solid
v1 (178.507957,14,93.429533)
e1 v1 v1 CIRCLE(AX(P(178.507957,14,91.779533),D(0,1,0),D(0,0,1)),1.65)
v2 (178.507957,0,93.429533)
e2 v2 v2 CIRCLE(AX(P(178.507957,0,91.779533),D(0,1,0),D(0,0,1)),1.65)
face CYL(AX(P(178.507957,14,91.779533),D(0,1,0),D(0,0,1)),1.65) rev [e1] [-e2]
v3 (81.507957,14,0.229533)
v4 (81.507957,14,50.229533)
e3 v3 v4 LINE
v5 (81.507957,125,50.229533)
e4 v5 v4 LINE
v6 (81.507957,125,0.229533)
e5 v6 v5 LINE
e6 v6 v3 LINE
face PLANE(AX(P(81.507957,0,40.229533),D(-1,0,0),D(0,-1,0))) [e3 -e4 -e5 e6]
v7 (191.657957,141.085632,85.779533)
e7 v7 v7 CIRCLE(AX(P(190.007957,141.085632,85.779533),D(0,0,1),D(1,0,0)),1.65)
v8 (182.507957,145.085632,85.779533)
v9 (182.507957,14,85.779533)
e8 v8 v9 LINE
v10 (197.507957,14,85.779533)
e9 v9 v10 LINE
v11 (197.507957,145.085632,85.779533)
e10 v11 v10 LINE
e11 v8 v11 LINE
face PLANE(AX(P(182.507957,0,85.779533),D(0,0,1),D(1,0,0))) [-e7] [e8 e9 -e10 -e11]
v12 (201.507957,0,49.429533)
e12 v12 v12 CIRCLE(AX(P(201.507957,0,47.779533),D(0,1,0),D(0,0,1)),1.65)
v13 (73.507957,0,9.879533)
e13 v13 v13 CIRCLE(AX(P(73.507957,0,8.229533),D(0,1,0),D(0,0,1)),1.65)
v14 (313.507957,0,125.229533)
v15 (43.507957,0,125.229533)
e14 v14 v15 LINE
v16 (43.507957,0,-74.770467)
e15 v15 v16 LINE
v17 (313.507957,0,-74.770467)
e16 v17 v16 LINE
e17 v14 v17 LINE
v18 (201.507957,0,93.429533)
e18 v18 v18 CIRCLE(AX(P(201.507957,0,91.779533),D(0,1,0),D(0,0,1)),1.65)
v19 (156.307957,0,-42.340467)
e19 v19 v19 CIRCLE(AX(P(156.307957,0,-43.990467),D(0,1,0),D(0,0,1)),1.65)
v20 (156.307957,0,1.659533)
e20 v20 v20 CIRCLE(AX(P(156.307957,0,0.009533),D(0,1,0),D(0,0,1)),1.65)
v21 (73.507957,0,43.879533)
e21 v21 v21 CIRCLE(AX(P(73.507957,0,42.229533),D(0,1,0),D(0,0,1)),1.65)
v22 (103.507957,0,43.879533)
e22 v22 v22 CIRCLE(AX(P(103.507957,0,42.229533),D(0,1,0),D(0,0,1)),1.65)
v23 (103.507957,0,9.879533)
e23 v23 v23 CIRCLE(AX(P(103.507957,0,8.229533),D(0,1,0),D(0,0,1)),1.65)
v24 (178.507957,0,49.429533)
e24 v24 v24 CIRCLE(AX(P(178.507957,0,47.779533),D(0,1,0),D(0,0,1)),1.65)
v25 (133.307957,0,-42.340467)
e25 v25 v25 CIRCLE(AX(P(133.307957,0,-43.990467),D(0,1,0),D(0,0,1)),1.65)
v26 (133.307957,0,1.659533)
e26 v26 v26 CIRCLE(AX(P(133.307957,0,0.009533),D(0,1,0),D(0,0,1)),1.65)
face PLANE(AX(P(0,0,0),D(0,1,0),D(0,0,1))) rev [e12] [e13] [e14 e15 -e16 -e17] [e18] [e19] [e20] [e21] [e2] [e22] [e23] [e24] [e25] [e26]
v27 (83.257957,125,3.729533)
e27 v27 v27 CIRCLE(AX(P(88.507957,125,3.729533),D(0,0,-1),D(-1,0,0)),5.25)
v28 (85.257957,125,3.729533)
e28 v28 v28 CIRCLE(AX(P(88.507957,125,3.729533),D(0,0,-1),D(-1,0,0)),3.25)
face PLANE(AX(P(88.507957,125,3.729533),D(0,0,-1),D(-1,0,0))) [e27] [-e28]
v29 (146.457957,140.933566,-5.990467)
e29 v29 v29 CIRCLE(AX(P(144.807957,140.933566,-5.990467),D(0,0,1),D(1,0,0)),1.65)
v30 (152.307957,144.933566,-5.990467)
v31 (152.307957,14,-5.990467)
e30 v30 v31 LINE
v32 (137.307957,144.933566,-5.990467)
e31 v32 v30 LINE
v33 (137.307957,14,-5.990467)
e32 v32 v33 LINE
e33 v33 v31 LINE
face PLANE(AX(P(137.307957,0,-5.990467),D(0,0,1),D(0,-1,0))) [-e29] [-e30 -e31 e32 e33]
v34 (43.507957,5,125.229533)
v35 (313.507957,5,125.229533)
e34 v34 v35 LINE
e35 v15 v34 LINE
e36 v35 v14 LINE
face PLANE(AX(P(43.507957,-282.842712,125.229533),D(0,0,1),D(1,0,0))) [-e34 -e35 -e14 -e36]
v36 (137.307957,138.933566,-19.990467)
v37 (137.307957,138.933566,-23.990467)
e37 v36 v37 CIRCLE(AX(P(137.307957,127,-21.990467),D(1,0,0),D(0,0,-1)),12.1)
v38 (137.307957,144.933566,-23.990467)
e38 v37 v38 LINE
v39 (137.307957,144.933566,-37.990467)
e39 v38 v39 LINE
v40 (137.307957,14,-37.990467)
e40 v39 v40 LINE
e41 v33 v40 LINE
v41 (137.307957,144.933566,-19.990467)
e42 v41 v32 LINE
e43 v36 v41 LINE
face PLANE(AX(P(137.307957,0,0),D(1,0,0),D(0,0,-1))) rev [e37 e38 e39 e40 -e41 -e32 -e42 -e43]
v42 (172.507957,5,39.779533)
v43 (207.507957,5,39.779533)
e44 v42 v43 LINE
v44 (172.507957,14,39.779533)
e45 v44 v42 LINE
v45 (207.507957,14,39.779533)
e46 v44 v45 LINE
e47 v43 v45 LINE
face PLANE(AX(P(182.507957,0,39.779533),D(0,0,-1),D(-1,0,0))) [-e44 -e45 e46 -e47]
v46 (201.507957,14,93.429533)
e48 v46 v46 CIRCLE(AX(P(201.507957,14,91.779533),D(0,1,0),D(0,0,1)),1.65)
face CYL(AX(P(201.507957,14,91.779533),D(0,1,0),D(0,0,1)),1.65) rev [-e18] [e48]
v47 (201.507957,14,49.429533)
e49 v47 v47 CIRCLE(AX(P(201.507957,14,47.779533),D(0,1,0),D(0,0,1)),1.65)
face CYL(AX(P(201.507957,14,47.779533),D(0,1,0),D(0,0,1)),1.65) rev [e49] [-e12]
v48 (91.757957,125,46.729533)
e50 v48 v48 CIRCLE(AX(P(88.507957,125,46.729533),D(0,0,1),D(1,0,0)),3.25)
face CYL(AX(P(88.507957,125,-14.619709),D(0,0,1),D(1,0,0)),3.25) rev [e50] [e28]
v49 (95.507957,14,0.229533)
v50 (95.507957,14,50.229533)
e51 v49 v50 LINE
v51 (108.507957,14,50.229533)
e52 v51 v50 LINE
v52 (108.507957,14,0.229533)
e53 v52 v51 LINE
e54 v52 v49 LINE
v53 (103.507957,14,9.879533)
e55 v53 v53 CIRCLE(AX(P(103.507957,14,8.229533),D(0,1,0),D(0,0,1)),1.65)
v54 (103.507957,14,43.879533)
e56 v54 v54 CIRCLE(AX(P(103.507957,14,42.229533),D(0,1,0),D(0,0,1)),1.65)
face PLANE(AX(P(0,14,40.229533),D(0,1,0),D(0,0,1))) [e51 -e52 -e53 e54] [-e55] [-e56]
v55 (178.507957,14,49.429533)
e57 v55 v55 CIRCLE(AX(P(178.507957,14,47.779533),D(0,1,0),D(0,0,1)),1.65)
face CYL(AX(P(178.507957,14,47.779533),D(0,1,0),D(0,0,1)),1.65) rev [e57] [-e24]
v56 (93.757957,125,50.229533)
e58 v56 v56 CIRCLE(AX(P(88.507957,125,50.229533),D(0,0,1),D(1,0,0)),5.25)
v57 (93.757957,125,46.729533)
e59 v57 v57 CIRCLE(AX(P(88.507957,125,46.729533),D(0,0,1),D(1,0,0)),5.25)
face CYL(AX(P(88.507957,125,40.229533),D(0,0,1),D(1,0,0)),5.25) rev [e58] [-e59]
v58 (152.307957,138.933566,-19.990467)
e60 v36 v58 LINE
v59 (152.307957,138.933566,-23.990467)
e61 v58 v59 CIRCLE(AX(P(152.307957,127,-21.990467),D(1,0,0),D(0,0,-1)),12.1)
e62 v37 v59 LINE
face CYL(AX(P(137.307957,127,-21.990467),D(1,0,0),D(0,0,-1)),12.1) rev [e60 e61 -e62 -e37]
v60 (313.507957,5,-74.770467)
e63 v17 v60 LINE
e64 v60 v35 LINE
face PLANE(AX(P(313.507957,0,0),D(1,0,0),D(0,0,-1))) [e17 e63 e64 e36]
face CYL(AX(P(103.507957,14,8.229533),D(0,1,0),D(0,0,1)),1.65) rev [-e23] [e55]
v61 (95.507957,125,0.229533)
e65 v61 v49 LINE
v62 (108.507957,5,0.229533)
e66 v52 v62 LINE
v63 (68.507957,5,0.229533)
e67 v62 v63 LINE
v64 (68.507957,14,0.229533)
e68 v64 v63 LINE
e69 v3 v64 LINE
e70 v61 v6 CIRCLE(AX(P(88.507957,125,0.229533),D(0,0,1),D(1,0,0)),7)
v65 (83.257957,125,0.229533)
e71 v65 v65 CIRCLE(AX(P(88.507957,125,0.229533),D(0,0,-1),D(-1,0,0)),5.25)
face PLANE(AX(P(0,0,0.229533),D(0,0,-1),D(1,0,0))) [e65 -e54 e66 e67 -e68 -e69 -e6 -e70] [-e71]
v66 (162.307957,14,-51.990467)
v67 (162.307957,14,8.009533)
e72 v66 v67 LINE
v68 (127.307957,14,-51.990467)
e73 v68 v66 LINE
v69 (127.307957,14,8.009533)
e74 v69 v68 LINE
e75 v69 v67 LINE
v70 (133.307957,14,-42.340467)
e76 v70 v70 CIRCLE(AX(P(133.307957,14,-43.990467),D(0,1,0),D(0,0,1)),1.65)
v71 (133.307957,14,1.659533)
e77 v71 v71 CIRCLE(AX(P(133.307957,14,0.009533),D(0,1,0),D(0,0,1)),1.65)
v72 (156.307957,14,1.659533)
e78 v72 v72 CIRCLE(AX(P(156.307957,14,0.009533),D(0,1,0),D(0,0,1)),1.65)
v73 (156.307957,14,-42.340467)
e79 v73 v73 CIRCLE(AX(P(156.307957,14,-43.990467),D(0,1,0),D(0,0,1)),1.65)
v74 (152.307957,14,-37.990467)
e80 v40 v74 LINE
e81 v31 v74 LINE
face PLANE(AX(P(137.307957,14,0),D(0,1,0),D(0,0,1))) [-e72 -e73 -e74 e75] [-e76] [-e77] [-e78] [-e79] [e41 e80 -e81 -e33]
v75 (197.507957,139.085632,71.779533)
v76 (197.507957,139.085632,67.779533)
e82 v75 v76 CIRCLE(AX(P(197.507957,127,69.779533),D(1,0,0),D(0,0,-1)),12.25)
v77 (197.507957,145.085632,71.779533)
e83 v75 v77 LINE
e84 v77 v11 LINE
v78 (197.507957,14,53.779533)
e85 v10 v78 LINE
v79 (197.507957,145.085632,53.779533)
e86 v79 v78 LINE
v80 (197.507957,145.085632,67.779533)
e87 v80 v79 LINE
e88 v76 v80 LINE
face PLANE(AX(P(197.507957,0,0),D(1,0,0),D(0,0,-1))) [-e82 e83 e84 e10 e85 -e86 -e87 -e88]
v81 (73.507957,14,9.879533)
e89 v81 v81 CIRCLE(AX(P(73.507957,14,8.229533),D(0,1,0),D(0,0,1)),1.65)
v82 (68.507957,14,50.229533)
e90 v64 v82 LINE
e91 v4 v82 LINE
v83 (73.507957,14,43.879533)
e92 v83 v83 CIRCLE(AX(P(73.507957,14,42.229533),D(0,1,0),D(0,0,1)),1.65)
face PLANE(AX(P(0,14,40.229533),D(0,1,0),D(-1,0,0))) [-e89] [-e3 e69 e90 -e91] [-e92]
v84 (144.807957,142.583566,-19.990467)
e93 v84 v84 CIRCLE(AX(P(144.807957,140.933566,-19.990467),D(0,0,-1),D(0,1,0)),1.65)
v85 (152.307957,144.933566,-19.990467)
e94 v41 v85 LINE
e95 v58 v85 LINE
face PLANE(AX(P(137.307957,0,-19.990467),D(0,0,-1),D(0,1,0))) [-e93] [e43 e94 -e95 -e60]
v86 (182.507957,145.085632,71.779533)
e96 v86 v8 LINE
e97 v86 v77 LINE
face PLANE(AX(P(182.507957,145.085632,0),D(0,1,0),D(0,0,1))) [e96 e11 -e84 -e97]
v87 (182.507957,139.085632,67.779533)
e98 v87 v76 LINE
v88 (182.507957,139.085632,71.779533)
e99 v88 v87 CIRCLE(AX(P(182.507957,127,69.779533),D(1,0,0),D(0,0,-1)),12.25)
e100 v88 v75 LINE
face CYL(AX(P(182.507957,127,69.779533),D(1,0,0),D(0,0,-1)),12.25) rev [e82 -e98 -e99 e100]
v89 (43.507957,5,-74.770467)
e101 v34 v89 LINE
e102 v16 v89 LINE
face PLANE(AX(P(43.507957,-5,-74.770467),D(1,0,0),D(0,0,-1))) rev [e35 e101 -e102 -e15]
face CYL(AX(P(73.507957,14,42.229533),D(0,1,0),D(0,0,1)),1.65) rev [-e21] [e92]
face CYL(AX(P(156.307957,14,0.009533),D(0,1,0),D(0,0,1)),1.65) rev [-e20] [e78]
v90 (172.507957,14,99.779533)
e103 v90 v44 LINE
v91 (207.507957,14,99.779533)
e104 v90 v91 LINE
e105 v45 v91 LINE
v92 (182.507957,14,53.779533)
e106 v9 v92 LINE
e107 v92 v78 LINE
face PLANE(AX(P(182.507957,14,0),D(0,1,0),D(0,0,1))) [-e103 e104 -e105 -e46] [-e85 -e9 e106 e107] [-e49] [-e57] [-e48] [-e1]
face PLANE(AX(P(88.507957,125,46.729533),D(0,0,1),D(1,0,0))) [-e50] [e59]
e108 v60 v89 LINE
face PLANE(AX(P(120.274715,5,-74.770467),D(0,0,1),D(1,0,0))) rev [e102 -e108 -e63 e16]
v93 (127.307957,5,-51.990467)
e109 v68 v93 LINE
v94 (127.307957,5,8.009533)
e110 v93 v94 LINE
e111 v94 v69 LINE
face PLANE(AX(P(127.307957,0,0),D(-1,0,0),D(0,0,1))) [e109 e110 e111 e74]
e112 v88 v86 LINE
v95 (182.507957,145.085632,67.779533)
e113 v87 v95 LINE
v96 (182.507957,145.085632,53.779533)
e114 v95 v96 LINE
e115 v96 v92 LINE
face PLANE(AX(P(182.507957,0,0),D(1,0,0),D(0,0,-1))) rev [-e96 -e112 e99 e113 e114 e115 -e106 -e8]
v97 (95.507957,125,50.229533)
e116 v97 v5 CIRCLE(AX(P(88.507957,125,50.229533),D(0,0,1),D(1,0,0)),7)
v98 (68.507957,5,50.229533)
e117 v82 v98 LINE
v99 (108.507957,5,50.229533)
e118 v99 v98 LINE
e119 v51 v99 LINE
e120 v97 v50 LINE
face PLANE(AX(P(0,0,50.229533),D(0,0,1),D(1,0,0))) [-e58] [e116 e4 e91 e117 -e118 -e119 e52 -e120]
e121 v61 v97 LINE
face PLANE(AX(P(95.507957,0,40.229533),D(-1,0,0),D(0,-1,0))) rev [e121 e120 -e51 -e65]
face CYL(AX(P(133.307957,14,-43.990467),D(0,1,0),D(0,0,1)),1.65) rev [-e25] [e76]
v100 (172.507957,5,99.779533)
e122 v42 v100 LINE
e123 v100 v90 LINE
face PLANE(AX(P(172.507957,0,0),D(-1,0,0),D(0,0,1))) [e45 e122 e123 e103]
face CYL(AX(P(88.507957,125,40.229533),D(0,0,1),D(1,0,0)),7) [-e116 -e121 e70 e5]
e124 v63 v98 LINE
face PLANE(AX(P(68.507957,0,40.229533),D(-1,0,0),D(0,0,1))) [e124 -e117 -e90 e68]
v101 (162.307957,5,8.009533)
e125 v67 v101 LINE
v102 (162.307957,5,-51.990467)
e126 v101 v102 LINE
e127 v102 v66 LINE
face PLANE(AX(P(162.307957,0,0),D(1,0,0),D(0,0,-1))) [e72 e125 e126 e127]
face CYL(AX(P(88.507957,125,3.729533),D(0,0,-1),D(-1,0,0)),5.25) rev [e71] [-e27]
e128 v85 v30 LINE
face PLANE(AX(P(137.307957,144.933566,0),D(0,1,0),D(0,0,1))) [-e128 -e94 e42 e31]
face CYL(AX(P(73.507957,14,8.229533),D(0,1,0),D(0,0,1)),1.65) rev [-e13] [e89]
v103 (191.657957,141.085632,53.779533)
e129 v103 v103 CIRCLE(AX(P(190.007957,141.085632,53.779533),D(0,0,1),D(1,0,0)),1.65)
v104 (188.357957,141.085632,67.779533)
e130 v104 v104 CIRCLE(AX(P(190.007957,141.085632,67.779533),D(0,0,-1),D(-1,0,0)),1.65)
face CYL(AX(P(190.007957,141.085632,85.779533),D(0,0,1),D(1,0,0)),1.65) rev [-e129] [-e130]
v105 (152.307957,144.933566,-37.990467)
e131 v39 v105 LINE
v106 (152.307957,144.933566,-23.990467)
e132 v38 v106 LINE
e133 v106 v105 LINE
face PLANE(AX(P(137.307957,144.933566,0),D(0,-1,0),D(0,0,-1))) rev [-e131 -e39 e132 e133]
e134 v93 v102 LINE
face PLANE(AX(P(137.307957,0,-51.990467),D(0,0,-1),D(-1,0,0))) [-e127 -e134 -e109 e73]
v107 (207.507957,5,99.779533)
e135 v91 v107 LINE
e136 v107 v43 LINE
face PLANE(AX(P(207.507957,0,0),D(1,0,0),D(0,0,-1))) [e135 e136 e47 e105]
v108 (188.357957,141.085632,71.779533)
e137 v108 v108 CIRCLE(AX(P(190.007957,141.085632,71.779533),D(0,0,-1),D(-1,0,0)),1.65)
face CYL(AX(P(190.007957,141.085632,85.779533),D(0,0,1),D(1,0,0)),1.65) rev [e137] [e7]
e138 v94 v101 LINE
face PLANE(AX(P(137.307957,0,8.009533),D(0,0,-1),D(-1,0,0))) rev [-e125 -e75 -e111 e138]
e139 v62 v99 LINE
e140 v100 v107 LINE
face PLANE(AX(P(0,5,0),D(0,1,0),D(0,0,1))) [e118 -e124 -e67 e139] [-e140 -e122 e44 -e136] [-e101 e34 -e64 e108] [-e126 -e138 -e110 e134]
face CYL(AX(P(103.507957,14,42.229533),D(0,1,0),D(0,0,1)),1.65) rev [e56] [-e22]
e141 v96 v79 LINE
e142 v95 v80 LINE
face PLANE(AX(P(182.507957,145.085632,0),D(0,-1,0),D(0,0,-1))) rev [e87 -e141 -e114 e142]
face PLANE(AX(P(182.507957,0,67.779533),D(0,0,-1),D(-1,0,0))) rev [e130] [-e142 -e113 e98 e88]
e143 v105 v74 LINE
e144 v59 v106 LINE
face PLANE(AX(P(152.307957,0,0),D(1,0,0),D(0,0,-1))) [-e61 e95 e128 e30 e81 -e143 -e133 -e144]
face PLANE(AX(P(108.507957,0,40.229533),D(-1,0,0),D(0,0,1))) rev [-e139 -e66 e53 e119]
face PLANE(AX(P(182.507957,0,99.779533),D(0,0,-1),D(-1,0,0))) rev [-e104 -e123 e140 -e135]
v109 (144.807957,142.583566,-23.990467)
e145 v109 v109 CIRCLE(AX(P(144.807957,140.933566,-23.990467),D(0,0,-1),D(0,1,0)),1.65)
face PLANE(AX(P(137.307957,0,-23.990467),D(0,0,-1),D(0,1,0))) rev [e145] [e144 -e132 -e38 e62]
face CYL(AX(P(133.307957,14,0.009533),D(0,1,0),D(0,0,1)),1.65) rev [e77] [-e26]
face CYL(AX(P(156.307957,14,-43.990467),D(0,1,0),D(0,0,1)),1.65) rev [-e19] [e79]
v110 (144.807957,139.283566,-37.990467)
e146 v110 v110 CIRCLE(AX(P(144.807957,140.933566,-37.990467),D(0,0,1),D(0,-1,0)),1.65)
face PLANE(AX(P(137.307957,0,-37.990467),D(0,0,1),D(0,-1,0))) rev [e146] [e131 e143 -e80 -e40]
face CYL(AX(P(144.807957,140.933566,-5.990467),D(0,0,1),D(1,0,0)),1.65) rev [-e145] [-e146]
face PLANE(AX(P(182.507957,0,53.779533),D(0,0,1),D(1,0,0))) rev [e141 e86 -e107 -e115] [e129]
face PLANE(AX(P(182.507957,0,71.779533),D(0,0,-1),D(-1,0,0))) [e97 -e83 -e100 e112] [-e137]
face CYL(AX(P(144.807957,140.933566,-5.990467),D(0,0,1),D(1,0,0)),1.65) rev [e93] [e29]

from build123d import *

# Parameters (mm, degrees)
SKETCH_2_W                 = 240.549430728
SKETCH_2_H                 = 149.540933388
EXTRUDE_1_DEPTH            = 5
SKETCH_6_W                 = 93.246571425
SKETCH_6_H                 = 149.540933388
EXTRUDE_4_DEPTH            = 5
SKETCH_8_W                 = 274.716709757
SKETCH_8_H                 = 58.51354913
EXTRUDE_6_DEPTH            = 5
CUT_EXTRUDE_2_DEPTH        = 252.755772101
CUT_EXTRUDE_2_DEPTH_BACK   = 252.755772101
SKETCH_9_W                 = 59.079292396
SKETCH_9_H                 = 149.540933388
SKETCH_10_W                = 104.703380117
SKETCH_10_H                = 208.054482518
CUT_EXTRUDE_3_DEPTH        = 10
SKETCH_12_W                = 200
SKETCH_12_H                = 200
EXTRUDE_7_DEPTH            = 5
SKETCH_13_OUTSIDE_W        = 259.728
SKETCH_13_OUTSIDE_H        = 267.782
SKETCH_13_OUTSIDE_W_2      = 200
SKETCH_13_OUTSIDE_H_2      = 200
CUT_EXTRUDE_4_DEPTH        = 278.64321362
EXTRUDE_START              = -75
SKETCH_18_R                = 5.25
EXTRUDE_9_DEPTH            = 10
EXTRUDE_START_2            = -46
EXTRUDE_10_DEPTH           = 15
EXTRUDE_START_3            = -91.2
EXTRUDE_11_DEPTH           = 15
EXTRUDE_12_REACH           = 307.894
SKETCH_20_R                = 5.25
SKETCH_26_W                = 200
SKETCH_26_H                = 5
EXTRUDE_13_DEPTH           = 100
SKETCH_27_W                = 200
SKETCH_27_H                = 5
CUT_EXTRUDE_5_DEPTH        = 30
EXTRUDE_14_DEPTH           = 10
SKETCH_29_W                = 60
SKETCH_29_H                = 9
EXTRUDE_15_DEPTH           = 10
HOLE_WIZARD_M4_1_OUTLINE_R = 1.65
HOLE_WIZARD_M4_1_DEPTH     = 14
HOLE_WIZARD_M4_2_D         = 3.3
HOLE_START                 = -37.990466694
HOLE_WIZARD_M4_3_OUTLINE_R = 1.65
HOLE_WIZARD_M4_3_DEPTH     = 32
EXTRUDE_16_DEPTH           = 10
SKETCH_37_W                = 60
SKETCH_37_H                = 9
EXTRUDE_17_DEPTH           = 10
HOLE_WIZARD_M4_4_OUTLINE_R = 1.65
HOLE_WIZARD_M4_4_DEPTH     = 14
EXTRUDE_START_4            = -3.5
SKETCH_40_R                = 5.25
SKETCH_40_R_2              = 3.25
EXTRUDE_18_DEPTH           = 46.5
CUT_EXTRUDE_START          = -3.5
SKETCH_41_R                = 5.25
SKETCH_41_R_2              = 3.25
CUT_EXTRUDE_6_DEPTH        = 3.5
HOLE_WIZARD_M4_5_OUTLINE_R = 1.65
HOLE_WIZARD_M4_5_DEPTH     = 14


# Read off the part's stored shape, not the designer's step: M4 螺纹孔1, M4 螺纹孔3, M4 螺纹孔4, M4 螺纹孔5
with BuildPart() as part:
    # 草图2 → 凸台-拉伸1 (new body)
    with BuildSketch(Plane(origin=(0, 0, 0), x_dir=(1, 0, 0), z_dir=(0, 1, 0))):
        Rectangle(SKETCH_2_W, SKETCH_2_H)
    extrude(amount=EXTRUDE_1_DEPTH)

    # 草图6 → 凸台-拉伸4 (add)
    with BuildSketch(Plane(origin=(0, 5, 0), x_dir=(1, 0, 0), z_dir=(0, 1, 0))):
        with Locations((166.898001077, 0)):
            Rectangle(SKETCH_6_W, SKETCH_6_H)
    extrude(amount=-EXTRUDE_4_DEPTH)

    # 草图8 → 凸台-拉伸6 (add)
    with BuildSketch(Plane(origin=(0, 5, 0), x_dir=(1, 0, 0), z_dir=(0, 1, 0))):
        with Locations((76.162931911, -104.027241259)):
            Rectangle(SKETCH_8_W, SKETCH_8_H)
    extrude(amount=-EXTRUDE_6_DEPTH)

    # 草图9 → 切除-拉伸2 (cut, two sides: drawn at the far end of the back side and taken through both)
    with BuildSketch(Plane(origin=(0, 5, 0), x_dir=(1, 0, 0), z_dir=(0, 1, 0)).offset(-CUT_EXTRUDE_2_DEPTH_BACK)):
        with Locations((-90.735069166, 0)):
            Rectangle(SKETCH_9_W, SKETCH_9_H)
    extrude(amount=CUT_EXTRUDE_2_DEPTH + CUT_EXTRUDE_2_DEPTH_BACK, mode=Mode.SUBTRACT)

    # 草图10 → 切除-拉伸3 (cut)
    with BuildSketch(Plane(origin=(0, 5, 0), x_dir=(1, 0, 0), z_dir=(0, 1, 0))):
        with Locations((-8.84373291, -29.256774565)):
            Rectangle(SKETCH_10_W, SKETCH_10_H)
    extrude(amount=-CUT_EXTRUDE_3_DEPTH, mode=Mode.SUBTRACT)

    # 草图12 → 凸台-拉伸7 (add)
    with BuildSketch(Plane(origin=(0, 5, 0), x_dir=(1, 0, 0), z_dir=(0, 1, 0))):
        with Locations((143.507957149, -25.229533306)):
            Rectangle(SKETCH_12_W, SKETCH_12_H)
    extrude(amount=-EXTRUDE_7_DEPTH)

    # 草图13 outside → 切除-拉伸4 (cut, through all)
    with BuildSketch(Plane(origin=(0, 5, 0), x_dir=(1, 0, 0), z_dir=(0, 1, 0))):
        with Locations((143.508, -29.257)):
            Rectangle(SKETCH_13_OUTSIDE_W, SKETCH_13_OUTSIDE_H)
        with Locations((143.507957149, -25.229533306)):
            Rectangle(SKETCH_13_OUTSIDE_W_2, SKETCH_13_OUTSIDE_H_2, mode=Mode.SUBTRACT)
    extrude(amount=-CUT_EXTRUDE_4_DEPTH, mode=Mode.SUBTRACT)

    # 草图18 → 凸台-拉伸9 (add)
    with BuildSketch(Plane.XY.offset(125.229533306).offset(EXTRUDE_START)):
        with BuildLine():
            Line((95.507957149, 14), (95.507957149, 125))
            ThreePointArc((95.507957149, 125), (88.507957149, 132), (81.507957149, 125))
            Line((81.507957149, 125), (81.507957149, 14))
            Line((81.507957149, 14), (68.507957149, 14))
            Line((68.507957149, 14), (68.507957149, 5))
            Line((68.507957149, 5), (108.507957149, 5))
            Line((108.507957149, 5), (108.507957149, 14))
            Line((108.507957149, 14), (95.507957149, 14))
        make_face()
        with Locations((88.507957149, 125)):
            Circle(SKETCH_18_R, mode=Mode.SUBTRACT)
    extrude_9 = extrude(amount=-EXTRUDE_9_DEPTH)

    # 镜向1: 凸台-拉伸9 across plane
    add(extrude_9.mirror(Plane.XY.offset(25.229533306)))

    # 草图16 → 凸台-拉伸10 (add)
    with BuildSketch(Plane(origin=(243.507957149, 0, 0), x_dir=(0, 0, -1), z_dir=(1, 0, 0)).offset(EXTRUDE_START_2)):
        with BuildLine():
            Line((-53.779533306, 14), (-53.779533306, 145.085631965))
            Line((-53.779533306, 145.085631965), (-67.779533306, 145.085631965))
            Line((-67.779533306, 145.085631965), (-67.779533306, 139.085631965))
            ThreePointArc((-67.779533306, 139.085631965), (-69.779533306, 114.75), (-71.779533306, 139.085631965))
            Line((-71.779533306, 139.085631965), (-71.779533306, 145.085631965))
            Line((-71.779533306, 145.085631965), (-85.779533306, 145.085631965))
            Line((-85.779533306, 145.085631965), (-85.779533306, 14))
            Line((-85.779533306, 14), (-99.779533306, 14))
            Line((-99.779533306, 14), (-99.779533306, 5))
            Line((-99.779533306, 5), (-39.779533306, 5))
            Line((-39.779533306, 5), (-39.779533306, 14))
            Line((-39.779533306, 14), (-53.779533306, 14))
        make_face()
    extrude(amount=-EXTRUDE_10_DEPTH)

    # 草图19 → 凸台-拉伸11 (add)
    with BuildSketch(Plane(origin=(243.507957149, 0, 0), x_dir=(0, 0, -1), z_dir=(1, 0, 0)).offset(EXTRUDE_START_3)):
        with BuildLine():
            Line((37.990466694, 14), (37.990466694, 144.933566106))
            Line((37.990466694, 144.933566106), (23.990466694, 144.933566106))
            Line((23.990466694, 144.933566106), (23.990466694, 138.933566106))
            ThreePointArc((23.990466694, 138.933566106), (21.990466694, 114.9), (19.990466694, 138.933566106))
            Line((19.990466694, 138.933566106), (19.990466694, 144.933566106))
            Line((19.990466694, 144.933566106), (5.990466694, 144.933566106))
            Line((5.990466694, 144.933566106), (5.990466694, 14))
            Line((5.990466694, 14), (-8.009533306, 14))
            Line((-8.009533306, 14), (-8.009533306, 5))
            Line((-8.009533306, 5), (51.990466694, 5))
            Line((51.990466694, 5), (51.990466694, 14))
            Line((51.990466694, 14), (37.990466694, 14))
        make_face()
    extrude(amount=-EXTRUDE_11_DEPTH)

    # 草图20 → 凸台-拉伸12 (add, up to next)
    with BuildSketch(Plane(origin=(0, 0, 40.229533306), x_dir=(-1, 0, 0), z_dir=(0, 0, -1)), mode=Mode.PRIVATE) as extrude_12_sk1:
        with BuildLine():
            Line((-108.507957149, 5), (-68.507957149, 5))
            Line((-68.507957149, 5), (-68.507957149, 14))
            Line((-68.507957149, 14), (-81.507957149, 14))
            Line((-81.507957149, 14), (-81.507957149, 125))
            ThreePointArc((-81.507957149, 125), (-88.507957149, 132), (-95.507957149, 125))
            Line((-95.507957149, 125), (-95.507957149, 14))
            Line((-95.507957149, 14), (-108.507957149, 14))
            Line((-108.507957149, 14), (-108.507957149, 5))
        make_face()
        with Locations(Location((-88.507957149, 125, 0), (0, 0, 180))):
            Circle(SKETCH_20_R, mode=Mode.SUBTRACT)
    extrude_12_tool1 = extrude(extrude_12_sk1.sketch, amount=EXTRUDE_12_REACH, mode=Mode.PRIVATE) - part.part
    add(extrude_12_tool1.solids().sort_by_distance((88.507957, 57.997401, 40.229533))[0])

    # 草图26 → 凸台-拉伸13 (add)
    with BuildSketch(Plane(origin=(243.507957149, 0, 0), x_dir=(0, 0, -1), z_dir=(1, 0, 0))):
        with Locations((-25.229533306, 2.5)):
            Rectangle(SKETCH_26_W, SKETCH_26_H)
    extrude(amount=EXTRUDE_13_DEPTH)

    # 草图27 → 切除-拉伸5 (cut)
    with BuildSketch(Plane(origin=(343.507957149, 0, 0), x_dir=(0, 0, -1), z_dir=(1, 0, 0))):
        with Locations((-25.229533306, 2.5)):
            Rectangle(SKETCH_27_W, SKETCH_27_H)
    extrude(amount=-CUT_EXTRUDE_5_DEPTH, mode=Mode.SUBTRACT)

    # 草图28 → 凸台-拉伸14 (add)
    with BuildSketch(Plane(origin=(197.507957149, 0, 0), x_dir=(0, 0, -1), z_dir=(1, 0, 0))):
        Polygon((-85.779533306, 14), (-53.779533306, 14), (-39.779533306, 14), (-39.779533306, 5), (-99.779533306, 5), (-99.779533306, 14), align=None)
    extrude(amount=EXTRUDE_14_DEPTH)

    # 草图29 → 凸台-拉伸15 (add)
    with BuildSketch(Plane.ZY.offset(-182.507957149)):
        with Locations((69.779533306, 9.5)):
            Rectangle(SKETCH_29_W, SKETCH_29_H)
    extrude(amount=EXTRUDE_15_DEPTH)

    # M4 螺纹孔1 outline → M4 螺纹孔1 (cut)
    with BuildSketch(Plane(origin=(0, 0, 0), x_dir=(1, 0, 0), z_dir=(0, 1, 0))):
        with Locations((178.507957149, -91.779533306)):
            Circle(HOLE_WIZARD_M4_1_OUTLINE_R)
        with Locations((201.507957149, -91.779533306)):
            Circle(HOLE_WIZARD_M4_1_OUTLINE_R)
        with Locations((201.507957149, -47.779533306)):
            Circle(HOLE_WIZARD_M4_1_OUTLINE_R)
        with Locations((178.507957149, -47.779533306)):
            Circle(HOLE_WIZARD_M4_1_OUTLINE_R)
    extrude(amount=HOLE_WIZARD_M4_1_DEPTH, mode=Mode.SUBTRACT)

    # M4 螺纹孔2 (through all)
    with Locations(Plane.XY.offset(85.779533306)):
        with Locations((190.007957149, 141.085631965)):
            Hole(HOLE_WIZARD_M4_2_D / 2)

    # M4 螺纹孔3 outline → M4 螺纹孔3 (cut)
    with BuildSketch(Plane.XY.offset(HOLE_START)):
        with Locations((144.807957149, 140.933566106)):
            Circle(HOLE_WIZARD_M4_3_OUTLINE_R)
    extrude(amount=HOLE_WIZARD_M4_3_DEPTH, mode=Mode.SUBTRACT)

    # 草图36 → 凸台-拉伸16 (add)
    with BuildSketch(Plane(origin=(152.307957149, 0, 0), x_dir=(0, 0, -1), z_dir=(1, 0, 0))):
        Polygon((5.990466694, 14), (37.990466694, 14), (51.990466694, 14), (51.990466694, 5), (-8.009533306, 5), (-8.009533306, 14), align=None)
    extrude(amount=EXTRUDE_16_DEPTH)

    # 草图37 → 凸台-拉伸17 (add)
    with BuildSketch(Plane.ZY.offset(-137.307957149)):
        with Locations((-21.990466694, 9.5)):
            Rectangle(SKETCH_37_W, SKETCH_37_H)
    extrude(amount=EXTRUDE_17_DEPTH)

    # M4 螺纹孔4 outline → M4 螺纹孔4 (cut)
    with BuildSketch(Plane(origin=(0, 0, 0), x_dir=(1, 0, 0), z_dir=(0, 1, 0))):
        with Locations((133.307957149, -0.009533306)):
            Circle(HOLE_WIZARD_M4_4_OUTLINE_R)
        with Locations((156.307957149, -0.009533306)):
            Circle(HOLE_WIZARD_M4_4_OUTLINE_R)
        with Locations((156.307957149, 43.990466694)):
            Circle(HOLE_WIZARD_M4_4_OUTLINE_R)
        with Locations((133.307957149, 43.990466694)):
            Circle(HOLE_WIZARD_M4_4_OUTLINE_R)
    extrude(amount=HOLE_WIZARD_M4_4_DEPTH, mode=Mode.SUBTRACT)

    # 草图40 → 凸台-拉伸18 (add)
    with BuildSketch(Plane.XY.offset(50.229533306).offset(EXTRUDE_START_4)):
        with Locations((88.507957149, 125)):
            Circle(SKETCH_40_R)
        with Locations((88.507957149, 125)):
            Circle(SKETCH_40_R_2, mode=Mode.SUBTRACT)
    extrude(amount=-EXTRUDE_18_DEPTH)

    # 草图41 → 切除-拉伸6 (cut)
    with BuildSketch(Plane(origin=(0, 0, 0.229533306), x_dir=(-1, 0, 0), z_dir=(0, 0, -1)).offset(CUT_EXTRUDE_START)):
        with Locations(Location((-88.507957149, 125, 0), (0, 0, 180))):
            Circle(SKETCH_41_R)
        with Locations(Location((-88.507957149, 125, 0), (0, 0, 180))):
            Circle(SKETCH_41_R_2, mode=Mode.SUBTRACT)
    extrude(amount=CUT_EXTRUDE_6_DEPTH, mode=Mode.SUBTRACT)

    # M4 螺纹孔5 outline → M4 螺纹孔5 (cut)
    with BuildSketch(Plane(origin=(0, 0, 0), x_dir=(1, 0, 0), z_dir=(0, 1, 0))):
        with Locations((73.507957149, -42.229533306)):
            Circle(HOLE_WIZARD_M4_5_OUTLINE_R)
        with Locations((103.507957149, -42.229533306)):
            Circle(HOLE_WIZARD_M4_5_OUTLINE_R)
        with Locations((103.507957149, -8.229533306)):
            Circle(HOLE_WIZARD_M4_5_OUTLINE_R)
        with Locations((73.507957149, -8.229533306)):
            Circle(HOLE_WIZARD_M4_5_OUTLINE_R)
    extrude(amount=HOLE_WIZARD_M4_5_DEPTH, mode=Mode.SUBTRACT)


solid = part.part
